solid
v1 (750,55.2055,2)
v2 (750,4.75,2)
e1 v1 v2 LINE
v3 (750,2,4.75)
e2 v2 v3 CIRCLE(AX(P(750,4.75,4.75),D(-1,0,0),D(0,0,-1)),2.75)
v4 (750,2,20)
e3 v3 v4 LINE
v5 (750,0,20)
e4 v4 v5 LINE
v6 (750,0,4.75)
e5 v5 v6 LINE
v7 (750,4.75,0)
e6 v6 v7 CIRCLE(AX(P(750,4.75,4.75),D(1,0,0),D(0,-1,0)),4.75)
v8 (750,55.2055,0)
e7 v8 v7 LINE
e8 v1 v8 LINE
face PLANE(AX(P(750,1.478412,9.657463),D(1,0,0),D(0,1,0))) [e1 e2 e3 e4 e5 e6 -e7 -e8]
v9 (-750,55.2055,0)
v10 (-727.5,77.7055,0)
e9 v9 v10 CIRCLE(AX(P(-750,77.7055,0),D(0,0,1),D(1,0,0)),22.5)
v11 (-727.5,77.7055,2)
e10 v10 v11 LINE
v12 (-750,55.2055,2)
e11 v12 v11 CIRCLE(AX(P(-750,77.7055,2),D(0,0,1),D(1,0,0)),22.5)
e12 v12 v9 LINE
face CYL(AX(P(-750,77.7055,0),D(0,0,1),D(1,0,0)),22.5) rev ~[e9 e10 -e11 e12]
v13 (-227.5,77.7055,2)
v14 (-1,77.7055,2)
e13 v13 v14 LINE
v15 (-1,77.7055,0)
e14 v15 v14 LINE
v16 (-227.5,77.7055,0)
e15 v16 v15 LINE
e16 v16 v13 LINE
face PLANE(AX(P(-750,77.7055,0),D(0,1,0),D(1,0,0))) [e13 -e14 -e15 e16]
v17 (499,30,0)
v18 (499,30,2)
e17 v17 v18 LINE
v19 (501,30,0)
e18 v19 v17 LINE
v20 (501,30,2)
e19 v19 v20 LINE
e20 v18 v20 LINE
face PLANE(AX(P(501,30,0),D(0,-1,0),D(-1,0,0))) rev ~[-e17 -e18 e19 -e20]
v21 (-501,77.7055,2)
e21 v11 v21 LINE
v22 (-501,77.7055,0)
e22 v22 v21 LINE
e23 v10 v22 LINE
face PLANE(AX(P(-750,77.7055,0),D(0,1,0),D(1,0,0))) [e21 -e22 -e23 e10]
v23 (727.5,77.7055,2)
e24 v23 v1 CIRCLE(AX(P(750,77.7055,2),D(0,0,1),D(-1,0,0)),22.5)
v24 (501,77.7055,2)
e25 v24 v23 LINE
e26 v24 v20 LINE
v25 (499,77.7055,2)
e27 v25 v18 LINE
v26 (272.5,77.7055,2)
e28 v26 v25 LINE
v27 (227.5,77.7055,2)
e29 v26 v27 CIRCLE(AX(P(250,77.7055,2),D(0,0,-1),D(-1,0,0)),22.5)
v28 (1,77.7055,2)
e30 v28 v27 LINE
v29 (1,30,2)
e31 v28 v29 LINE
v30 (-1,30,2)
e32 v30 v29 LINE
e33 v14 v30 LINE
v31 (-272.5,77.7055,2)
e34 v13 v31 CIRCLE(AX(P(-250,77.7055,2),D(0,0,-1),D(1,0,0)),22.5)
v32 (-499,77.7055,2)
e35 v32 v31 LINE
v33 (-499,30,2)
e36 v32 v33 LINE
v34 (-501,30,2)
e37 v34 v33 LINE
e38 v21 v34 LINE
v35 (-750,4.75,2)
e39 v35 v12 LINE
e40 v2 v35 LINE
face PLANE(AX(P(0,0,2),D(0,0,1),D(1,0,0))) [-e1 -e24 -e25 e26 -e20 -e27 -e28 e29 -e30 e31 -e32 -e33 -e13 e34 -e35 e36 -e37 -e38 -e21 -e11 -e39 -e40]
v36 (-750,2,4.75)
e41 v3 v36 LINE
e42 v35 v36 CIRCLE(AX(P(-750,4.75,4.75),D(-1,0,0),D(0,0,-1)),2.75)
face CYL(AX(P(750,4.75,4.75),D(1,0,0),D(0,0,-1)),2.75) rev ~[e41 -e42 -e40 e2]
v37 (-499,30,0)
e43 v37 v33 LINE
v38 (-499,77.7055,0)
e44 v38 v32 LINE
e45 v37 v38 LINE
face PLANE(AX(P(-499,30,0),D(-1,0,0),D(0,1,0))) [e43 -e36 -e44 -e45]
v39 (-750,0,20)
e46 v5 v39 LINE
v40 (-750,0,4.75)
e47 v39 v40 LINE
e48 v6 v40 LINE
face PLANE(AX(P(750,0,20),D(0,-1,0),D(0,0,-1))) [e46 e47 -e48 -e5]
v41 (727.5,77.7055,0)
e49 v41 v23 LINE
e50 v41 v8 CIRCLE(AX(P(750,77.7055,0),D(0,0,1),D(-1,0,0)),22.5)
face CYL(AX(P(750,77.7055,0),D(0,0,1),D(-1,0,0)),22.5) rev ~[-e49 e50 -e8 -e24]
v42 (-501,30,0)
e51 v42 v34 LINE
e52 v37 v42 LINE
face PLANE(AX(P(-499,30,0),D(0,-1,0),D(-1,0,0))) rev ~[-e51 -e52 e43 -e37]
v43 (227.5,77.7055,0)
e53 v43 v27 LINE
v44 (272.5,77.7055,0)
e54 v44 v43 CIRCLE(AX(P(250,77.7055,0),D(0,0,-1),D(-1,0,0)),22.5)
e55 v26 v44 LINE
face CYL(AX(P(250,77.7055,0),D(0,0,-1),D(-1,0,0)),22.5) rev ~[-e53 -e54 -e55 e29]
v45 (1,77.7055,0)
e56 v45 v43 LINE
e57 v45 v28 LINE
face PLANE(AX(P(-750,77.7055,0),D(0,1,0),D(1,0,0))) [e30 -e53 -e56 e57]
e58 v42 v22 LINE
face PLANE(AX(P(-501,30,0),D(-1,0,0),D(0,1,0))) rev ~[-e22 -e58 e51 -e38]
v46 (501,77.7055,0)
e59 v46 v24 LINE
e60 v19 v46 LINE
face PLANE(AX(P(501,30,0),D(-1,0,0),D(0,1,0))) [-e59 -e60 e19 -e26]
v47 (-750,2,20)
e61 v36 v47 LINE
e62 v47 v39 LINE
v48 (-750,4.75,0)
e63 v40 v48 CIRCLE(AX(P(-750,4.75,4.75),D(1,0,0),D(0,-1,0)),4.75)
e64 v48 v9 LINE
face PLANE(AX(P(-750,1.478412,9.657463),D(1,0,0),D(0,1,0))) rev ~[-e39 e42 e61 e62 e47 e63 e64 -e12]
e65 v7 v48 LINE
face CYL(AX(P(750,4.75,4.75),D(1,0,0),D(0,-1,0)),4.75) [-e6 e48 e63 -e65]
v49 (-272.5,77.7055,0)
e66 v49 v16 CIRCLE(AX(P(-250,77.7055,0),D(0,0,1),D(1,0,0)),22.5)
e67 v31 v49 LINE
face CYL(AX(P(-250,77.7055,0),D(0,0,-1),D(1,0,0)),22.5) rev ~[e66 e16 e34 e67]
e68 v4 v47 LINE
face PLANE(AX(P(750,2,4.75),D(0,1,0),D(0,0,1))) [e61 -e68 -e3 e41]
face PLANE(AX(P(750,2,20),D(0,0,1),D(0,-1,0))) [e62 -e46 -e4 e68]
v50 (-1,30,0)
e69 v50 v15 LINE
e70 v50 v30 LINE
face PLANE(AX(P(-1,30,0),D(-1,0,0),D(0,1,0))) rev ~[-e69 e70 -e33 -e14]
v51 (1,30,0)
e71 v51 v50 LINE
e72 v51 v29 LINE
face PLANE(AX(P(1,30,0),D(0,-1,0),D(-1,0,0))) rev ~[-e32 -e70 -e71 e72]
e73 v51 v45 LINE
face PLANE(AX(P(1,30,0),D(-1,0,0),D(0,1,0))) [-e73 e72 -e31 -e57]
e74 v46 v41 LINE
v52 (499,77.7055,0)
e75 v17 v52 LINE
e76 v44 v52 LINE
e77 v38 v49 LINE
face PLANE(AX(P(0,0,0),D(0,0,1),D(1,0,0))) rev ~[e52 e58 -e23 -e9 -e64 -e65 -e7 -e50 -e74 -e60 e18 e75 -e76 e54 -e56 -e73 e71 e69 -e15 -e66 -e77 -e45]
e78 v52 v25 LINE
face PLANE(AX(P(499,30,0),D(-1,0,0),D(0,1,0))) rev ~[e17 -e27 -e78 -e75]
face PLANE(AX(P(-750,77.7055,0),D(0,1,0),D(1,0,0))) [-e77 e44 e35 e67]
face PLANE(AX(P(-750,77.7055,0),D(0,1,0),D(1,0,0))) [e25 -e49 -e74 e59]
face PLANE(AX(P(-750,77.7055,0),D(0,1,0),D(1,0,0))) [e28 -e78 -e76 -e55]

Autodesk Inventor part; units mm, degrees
ref_plane "YZ Plane" through (0, 0, 0) normal (1, 0, 0) x (0, 1, 0)
ref_plane "XZ Plane" through (0, 0, 0) normal (0, 1, 0) x (-1, 0, 0)
ref_plane "XY Plane" through (0, 0, 0) normal (0, 0, 1) x (1, 0, 0)
sketch "Sketch1" plane through (0, 0, 0) normal (0, 0, 1) x (1, 0, 0)
  line L0 (-750, 77.7055) -> (750, 77.7055)
  line L1 (750, 77.7055) -> (750, 0)
  line L2 (750, 0) -> (-750, 0)
  line L3 (-750, 0) -> (-750, 77.7055)
  point P0 (0, 0)
  point P1 (0, 0)
  dimension "d0" = 1500
  dimension "d1" = 77.7056
extrude "Plate1" add sketch "Sketch1" along normal blind 2
sketch "Sketch2" plane through (750, 2, 0) normal (0, -1, 0) x (1, 0, 0)
  line L0 (-1500, 0) -> (0, 0)
  line L1 (0, 0) -> (0, 20)
  line L2 (0, 20) -> (-1500, 20)
  line L3 (-1500, 20) -> (-1500, 0)
edge flange "Flange1" height 20 angle 90 thickness 2 bend radius 2.75 thickness toward (0, -1, 0) relief round relief width 2 relief depth 1 edges at (0, 0, 2) wall of the first edge with corners at (-750, 2, 0) (750, 2, 0) (750, 2, 20) (-750, 2, 20)
bend "Bend1"
corner "Corner1"
sketch "Sketch5" plane through (0, 0, 0) normal (0, 0, -1) x (-1, 0, 0)
  line L0 (750, 77.7055) -> (-750, 77.7055) projected
  line L1 (-1, 30) -> (-1, 77.7055)
  line L2 (750, 0) -> (-750, 0) projected
  line L3 (-1, 30) -> (1, 30)
  line L4 (1, 30) -> (1, 77.7055)
  point P0 (0, 0)
  point P1 (0, 30)
  point P2 (0, 0)
  dimension "d27" = 2
  dimension "d28" = 30
extrude "Extrusion1" cut sketch "Sketch5" against normal through all
pattern_linear "Rectangular Pattern1" count 3 spacing 500 along (1, 0, 0) of "Extrusion1" first direction both ways yes
sketch "Sketch6" plane through (0, 0, 0) normal (0, 0, -1) x (-1, 0, 0)
  line L0 (-750, 77.7055) -> (-750, 4.75) projected
  circle A0 centre (-750, 77.7055) radius 22.5
  line L1 (-750, 77.7055) -> (750, 77.7055) projected
  line L2 (-1, 77.7055) -> (-1, 30) projected
  line L3 (-499, 77.7055) -> (-499, 30) projected
  line L4 (-1, 30) -> (-499, 30) construction
  circle A1 centre (-250, 77.7055) radius 22.5
  point P0 (0, 0)
  point P1 (-727.5, 77.7055)
  point P2 (-750, 55.2055)
  point P3 (-250, 30)
  dimension "d24" = 45
extrude "Extrusion2" cut sketch "Sketch6" along normal mid plane 30 contours L1 A0 L0 | A1 L1 | L1 A1 picked at (-748.3311, 62.8935)
mirror "Mirror1" about plane through (0, 0, 0) normal (1, 0, 0) of "Extrusion2"
sketch "Sketch7" plane through (0, 0, 2) normal (0, 0, 1) x (1, 0, 0)
  arc A0 (-750, 55.2055) -> (-727.5, 77.7055) centre (-750, 77.7055) ccw projected
  line L0 (-750, 4.75) -> (-750, 55.2055) projected
  line L1 (-750, 4.75) -> (750, 4.75) projected
  line L2 (750, 55.2055) -> (750, 4.75) projected
  arc A1 (727.5, 77.7055) -> (750, 55.2055) centre (750, 77.7055) ccw projected
  line L3 (501, 77.7055) -> (727.5, 77.7055) projected
  line L4 (501, 77.7055) -> (501, 30) projected
  line L5 (501, 30) -> (499, 30) projected
  line L6 (499, 30) -> (499, 77.7055) projected
  line L7 (1, 77.7055) -> (227.5, 77.7055) projected
  line L8 (1, 77.7055) -> (1, 30) projected
  line L9 (1, 30) -> (-1, 30) projected
  line L10 (-1, 30) -> (-1, 77.7055) projected
  line L11 (-499, 77.7055) -> (-272.5, 77.7055) projected
  line L12 (-499, 77.7055) -> (-499, 30) projected
  line L13 (-499, 30) -> (-501, 30) projected
  line L14 (-501, 30) -> (-501, 77.7055) projected
  line L15 (-727.5, 77.7055) -> (-501, 77.7055) projected
  line L16 (750, 4.75) -> (-750, 4.75) projected
  line L17 (650, 4.75) -> (650, 77.7055) construction
  line L18 (-750, 4.75) -> (750, 4.75) projected
  line L19 (646, 37.7637) -> (650, 44.6919)
  line L20 (650, 44.6919) -> (654, 37.7637)
  line L21 (654, 37.7637) -> (646, 37.7637)
  line L22 (650, 44.6919) -> (650, 37.7637) construction
  line L23 (626, 37.7637) -> (630, 44.6919)
  line L24 (630, 44.6919) -> (634, 37.7637)
  line L25 (634, 37.7637) -> (626, 37.7637)
  line L26 (630, 44.6919) -> (630, 37.7637) construction
  line L27 (272.5, 77.7055) -> (499, 77.7055) projected
  arc A2 (227.5, 77.7055) -> (272.5, 77.7055) centre (250, 77.7055) ccw projected
  line L28 (-227.5, 77.7055) -> (-1, 77.7055) projected
  arc A3 (-272.5, 77.7055) -> (-227.5, 77.7055) centre (-250, 77.7055) ccw projected
  point P0 (0, 0)
  point P1 (650, 41.2278)
  point P2 (630, 41.2278)
  dimension "d29" = 100
  dimension "d30" = 8
  dimension "d31" = 8
  dimension "d32" = 20
extrude "Extrusion3" [suppressed]
mirror "Mirror2" [suppressed]
sketch "Sketch8" plane through (0, 0, 2) normal (0, 0, 1) x (1, 0, 0)
  line L0 (496, 72.7055) -> (496, 60.7055) construction
  line L1 (496, 60.7055) -> (296, 60.7055) construction
  line L2 (296, 60.7055) -> (296, 72.7055) construction
  line L3 (296, 72.7055) -> (496, 72.7055) construction
  line L4 (501, 77.7055) -> (727.5, 77.7055) projected
  line L5 (272.5, 77.7055) -> (499, 77.7055) projected
  point P0 (0, 0)
  dimension "d35" = 200
  dimension "d36" = 12
  dimension "d39" = 3
  dimension "d40" = 5
mark "Mark1"
equation "\"d28\" = Стрингер_глубина_паза"
equation "\"d1\" = Стрингер_6"
equation "\"d27\" = d18"
equation "\"d2\" = Thickness"
equation "\"d3\" = BendReliefWidth"
equation "\"d4\" = BendReliefDepth"
equation "\"d5\" = MinimumRemnant"
equation "\"d6\" = TransitionRadius"
equation "\"d9\" = BendRadius"
equation "\"d10\" = CornerReliefSize"
equation "\"d11\" = GapSize"
equation "\"d12\" = JacobiRadiusSize"
equation "\"BendReliefWidth\" = Thickness"
equation "\"BendReliefDepth\" = 0.5 * Thickness"
equation "\"CornerReliefSize\" = 4 * Thickness"
equation "\"MinimumRemnant\" = 2 * Thickness"
equation "\"TransitionRadius\" = BendRadius"
equation "\"JacobiRadiusSize\" = BendRadius"
equation "\"GapSize\" = Thickness"
equation "\"d18\" = Thickness"
equation "\"Стрингер_6\" = 77.705549"
equation "\"Thickness\" = 2"
equation "\"BendRadius\" = 2.75"
equation "\"Стрингер_глубина_паза\" = 30"
properties part number "MSC 066 stringer board ####" material "Stainless Steel"
